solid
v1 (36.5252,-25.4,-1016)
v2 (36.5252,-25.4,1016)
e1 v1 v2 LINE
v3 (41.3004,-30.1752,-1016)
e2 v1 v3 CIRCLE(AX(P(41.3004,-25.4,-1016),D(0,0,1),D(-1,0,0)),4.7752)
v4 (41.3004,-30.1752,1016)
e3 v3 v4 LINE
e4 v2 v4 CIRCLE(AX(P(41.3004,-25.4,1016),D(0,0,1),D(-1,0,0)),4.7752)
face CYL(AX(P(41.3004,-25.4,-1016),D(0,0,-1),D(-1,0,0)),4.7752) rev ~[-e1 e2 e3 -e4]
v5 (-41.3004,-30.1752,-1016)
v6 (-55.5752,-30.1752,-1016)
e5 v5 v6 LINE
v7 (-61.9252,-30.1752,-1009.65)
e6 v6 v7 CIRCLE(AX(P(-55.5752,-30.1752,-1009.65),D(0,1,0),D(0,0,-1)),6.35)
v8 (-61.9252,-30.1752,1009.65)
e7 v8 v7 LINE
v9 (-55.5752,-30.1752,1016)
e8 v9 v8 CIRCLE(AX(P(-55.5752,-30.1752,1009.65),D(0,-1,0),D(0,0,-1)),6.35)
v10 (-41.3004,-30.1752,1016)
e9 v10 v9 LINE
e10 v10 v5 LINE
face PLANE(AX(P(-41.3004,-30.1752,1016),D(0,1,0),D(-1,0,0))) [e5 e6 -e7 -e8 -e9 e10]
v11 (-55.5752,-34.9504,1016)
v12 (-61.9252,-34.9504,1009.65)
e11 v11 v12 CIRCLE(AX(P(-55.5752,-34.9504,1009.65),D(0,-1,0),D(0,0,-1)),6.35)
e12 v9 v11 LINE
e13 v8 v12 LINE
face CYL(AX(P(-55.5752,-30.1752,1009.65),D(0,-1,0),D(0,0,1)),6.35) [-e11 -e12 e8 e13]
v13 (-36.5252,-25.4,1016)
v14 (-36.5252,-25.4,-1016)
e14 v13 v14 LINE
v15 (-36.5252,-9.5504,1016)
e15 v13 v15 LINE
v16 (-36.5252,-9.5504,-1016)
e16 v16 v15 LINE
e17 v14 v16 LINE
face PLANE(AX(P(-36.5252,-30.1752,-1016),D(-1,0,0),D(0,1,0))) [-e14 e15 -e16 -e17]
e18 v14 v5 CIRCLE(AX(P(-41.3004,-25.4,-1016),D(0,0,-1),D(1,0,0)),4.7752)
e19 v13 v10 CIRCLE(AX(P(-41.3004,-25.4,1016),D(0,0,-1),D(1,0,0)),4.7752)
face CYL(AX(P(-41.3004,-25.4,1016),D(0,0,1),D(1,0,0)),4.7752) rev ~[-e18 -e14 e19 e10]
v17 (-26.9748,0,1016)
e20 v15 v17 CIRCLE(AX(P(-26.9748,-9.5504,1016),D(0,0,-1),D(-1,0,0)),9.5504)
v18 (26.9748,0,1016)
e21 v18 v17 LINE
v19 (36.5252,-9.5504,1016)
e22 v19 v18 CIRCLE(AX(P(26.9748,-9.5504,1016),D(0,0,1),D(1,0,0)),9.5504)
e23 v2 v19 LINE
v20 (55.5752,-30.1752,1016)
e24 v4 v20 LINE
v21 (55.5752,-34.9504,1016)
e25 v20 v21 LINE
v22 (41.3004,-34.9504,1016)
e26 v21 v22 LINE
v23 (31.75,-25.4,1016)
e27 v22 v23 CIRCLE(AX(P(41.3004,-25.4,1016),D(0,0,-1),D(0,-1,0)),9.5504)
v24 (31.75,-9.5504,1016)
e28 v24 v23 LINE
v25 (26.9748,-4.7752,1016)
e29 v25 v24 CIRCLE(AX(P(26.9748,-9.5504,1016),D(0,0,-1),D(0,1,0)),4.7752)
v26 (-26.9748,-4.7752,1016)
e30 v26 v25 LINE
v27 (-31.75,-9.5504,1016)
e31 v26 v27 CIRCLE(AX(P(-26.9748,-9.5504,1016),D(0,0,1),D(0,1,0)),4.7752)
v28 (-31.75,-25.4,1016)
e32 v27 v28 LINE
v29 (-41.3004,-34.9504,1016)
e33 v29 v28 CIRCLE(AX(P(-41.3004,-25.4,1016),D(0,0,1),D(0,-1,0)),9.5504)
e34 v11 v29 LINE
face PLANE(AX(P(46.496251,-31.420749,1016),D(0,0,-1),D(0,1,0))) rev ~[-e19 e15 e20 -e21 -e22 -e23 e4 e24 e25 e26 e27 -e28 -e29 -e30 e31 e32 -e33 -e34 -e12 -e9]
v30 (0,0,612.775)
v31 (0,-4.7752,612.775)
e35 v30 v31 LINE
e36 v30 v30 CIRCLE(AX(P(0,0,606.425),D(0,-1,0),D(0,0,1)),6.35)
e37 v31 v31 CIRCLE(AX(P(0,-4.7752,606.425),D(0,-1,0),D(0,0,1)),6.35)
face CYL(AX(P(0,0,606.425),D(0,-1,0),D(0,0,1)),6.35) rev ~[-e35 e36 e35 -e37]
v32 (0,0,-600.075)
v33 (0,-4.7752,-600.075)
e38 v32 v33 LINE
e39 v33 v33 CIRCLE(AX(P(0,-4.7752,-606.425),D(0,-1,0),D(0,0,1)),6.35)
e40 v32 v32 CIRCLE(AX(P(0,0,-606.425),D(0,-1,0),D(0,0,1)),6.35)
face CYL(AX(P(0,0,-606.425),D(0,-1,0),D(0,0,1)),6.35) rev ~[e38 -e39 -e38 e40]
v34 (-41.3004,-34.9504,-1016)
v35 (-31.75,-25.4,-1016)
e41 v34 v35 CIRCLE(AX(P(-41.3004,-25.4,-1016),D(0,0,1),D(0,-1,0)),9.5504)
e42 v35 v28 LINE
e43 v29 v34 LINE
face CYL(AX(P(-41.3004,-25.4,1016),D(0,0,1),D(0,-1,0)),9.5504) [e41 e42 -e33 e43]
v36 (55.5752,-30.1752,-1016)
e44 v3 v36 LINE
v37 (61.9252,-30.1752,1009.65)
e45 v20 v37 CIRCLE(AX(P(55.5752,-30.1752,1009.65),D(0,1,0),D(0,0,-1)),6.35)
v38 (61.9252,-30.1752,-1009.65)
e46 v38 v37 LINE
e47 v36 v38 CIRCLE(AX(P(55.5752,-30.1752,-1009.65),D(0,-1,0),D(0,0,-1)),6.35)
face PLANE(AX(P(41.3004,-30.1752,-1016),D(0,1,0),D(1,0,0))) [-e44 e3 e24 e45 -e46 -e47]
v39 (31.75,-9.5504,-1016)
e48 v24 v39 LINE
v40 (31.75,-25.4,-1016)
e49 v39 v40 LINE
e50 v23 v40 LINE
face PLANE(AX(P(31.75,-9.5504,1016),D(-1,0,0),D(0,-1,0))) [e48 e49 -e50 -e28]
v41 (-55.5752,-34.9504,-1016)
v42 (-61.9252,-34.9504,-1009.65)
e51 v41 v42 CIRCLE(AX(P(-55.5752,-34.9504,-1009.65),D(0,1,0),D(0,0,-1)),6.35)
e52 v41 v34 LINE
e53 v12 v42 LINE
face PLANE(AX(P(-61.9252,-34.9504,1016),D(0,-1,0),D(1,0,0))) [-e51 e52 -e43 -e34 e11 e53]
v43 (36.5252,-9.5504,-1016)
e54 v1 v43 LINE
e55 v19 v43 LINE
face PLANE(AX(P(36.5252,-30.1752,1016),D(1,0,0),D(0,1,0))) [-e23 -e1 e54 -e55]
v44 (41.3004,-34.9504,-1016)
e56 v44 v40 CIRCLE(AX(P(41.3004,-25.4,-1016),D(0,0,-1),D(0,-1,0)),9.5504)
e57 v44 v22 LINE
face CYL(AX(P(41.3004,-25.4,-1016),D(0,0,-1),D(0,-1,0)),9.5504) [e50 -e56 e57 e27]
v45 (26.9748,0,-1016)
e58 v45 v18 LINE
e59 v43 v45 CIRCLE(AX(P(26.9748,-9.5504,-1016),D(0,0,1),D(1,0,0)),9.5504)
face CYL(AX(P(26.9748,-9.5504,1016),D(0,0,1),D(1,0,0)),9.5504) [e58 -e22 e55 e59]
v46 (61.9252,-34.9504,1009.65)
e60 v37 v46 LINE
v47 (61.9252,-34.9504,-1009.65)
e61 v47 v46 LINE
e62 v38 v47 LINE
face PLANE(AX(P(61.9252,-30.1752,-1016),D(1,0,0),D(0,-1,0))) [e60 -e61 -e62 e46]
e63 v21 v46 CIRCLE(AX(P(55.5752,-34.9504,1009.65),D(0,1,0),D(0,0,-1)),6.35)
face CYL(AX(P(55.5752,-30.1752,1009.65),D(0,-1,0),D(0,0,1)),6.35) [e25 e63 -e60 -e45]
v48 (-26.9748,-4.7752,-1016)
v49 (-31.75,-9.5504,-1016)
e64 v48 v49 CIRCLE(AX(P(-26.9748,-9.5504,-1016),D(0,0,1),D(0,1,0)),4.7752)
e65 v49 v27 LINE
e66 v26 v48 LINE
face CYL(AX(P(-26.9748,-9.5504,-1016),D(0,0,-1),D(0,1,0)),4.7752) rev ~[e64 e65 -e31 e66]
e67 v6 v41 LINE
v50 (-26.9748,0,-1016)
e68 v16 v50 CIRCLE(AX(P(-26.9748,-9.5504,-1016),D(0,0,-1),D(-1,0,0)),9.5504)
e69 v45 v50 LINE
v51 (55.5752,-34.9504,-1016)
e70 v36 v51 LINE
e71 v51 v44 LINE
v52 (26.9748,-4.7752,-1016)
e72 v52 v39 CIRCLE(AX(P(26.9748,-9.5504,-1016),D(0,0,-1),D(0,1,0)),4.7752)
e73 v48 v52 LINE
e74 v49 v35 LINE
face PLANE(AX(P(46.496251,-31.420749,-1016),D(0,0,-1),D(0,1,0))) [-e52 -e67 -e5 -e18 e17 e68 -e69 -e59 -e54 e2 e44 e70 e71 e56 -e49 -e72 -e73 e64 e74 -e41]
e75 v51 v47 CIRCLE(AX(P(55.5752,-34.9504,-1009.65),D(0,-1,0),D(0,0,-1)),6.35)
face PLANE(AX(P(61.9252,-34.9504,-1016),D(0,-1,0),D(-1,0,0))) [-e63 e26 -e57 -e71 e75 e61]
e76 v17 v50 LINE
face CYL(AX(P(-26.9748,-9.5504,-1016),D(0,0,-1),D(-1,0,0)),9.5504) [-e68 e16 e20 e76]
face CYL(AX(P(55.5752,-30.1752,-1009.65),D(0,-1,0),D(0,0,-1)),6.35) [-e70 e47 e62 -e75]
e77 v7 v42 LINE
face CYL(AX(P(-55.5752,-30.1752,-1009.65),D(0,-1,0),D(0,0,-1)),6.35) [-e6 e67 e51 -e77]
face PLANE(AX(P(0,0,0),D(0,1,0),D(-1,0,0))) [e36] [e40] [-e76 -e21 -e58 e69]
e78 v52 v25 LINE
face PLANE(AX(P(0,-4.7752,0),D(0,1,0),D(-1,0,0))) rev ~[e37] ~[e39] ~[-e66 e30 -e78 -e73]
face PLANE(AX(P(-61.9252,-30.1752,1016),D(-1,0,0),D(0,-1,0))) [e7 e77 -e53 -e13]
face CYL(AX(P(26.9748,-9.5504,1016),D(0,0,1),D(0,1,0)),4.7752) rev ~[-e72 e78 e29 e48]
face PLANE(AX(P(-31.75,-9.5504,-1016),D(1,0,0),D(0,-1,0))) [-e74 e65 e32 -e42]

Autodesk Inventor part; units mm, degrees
ref_plane "YZ Plane" through (0, 0, 0) normal (1, 0, 0) x (0, 1, 0)
ref_plane "XZ Plane" through (0, 0, 0) normal (0, 1, 0) x (-1, 0, 0)
ref_plane "XY Plane" through (0, 0, 0) normal (0, 0, 1) x (1, 0, 0)
sketch "Sketch1" plane through (0, 0, 0) normal (0, 0, 1) x (1, 0, 0)
  point P0 (0, 0)
sketch "Sketch2" plane through (0, 0, 0) normal (0, 1, 0) x (-1, 0, 0)
  line L0 (-31.75, 1016) -> (31.75, 1016)
  line L1 (31.75, 1016) -> (31.75, -1016)
  line L2 (31.75, -1016) -> (-31.75, -1016)
  line L3 (-31.75, -1016) -> (-31.75, 1016)
  line L4 (-31.75, 1016) -> (31.75, -1016) construction
  line L5 (31.75, 1016) -> (-31.75, -1016) construction
  line L6 (0, -1016) -> (0, 1016)
  point P0 (0, 0)
  point P1 (0, -657.225)
  point P2 (0, -606.425)
  point P3 (0, 657.225)
  point P4 (0, 606.425)
  point P5 (0, 0)
  dimension "d0" = 63.5
  dimension "d1" = 2032
  dimension "d24" = 50.8
  dimension "d26" = 50.8
  dimension "d27" = 1212.85
  dimension "d28" = 606.425
extrude "Plate1" add sketch "Sketch2" against normal blind 4.7752
sketch "Sketch3" plane through (36.5252, 0, 1016) normal (-1, 0, 0) x (0, -1, 0)
  line L0 (0, -2032) -> (0, 0)
  line L1 (0, 0) -> (30.1752, 0)
  line L2 (30.1752, 0) -> (30.1752, -2032)
  line L3 (30.1752, -2032) -> (0, -2032)
edge flange "Flange1" height 25.4 angle 90 thickness 4.7752 bend radius 4.7752 thickness toward (-1, 0, 0) relief tear relief width 4.7752 relief depth 2.3876 corner gap 4.7752 corner form 0 edges at (31.75, -4.7752, 0) (-31.75, -4.7752, 0) wall of the first edge with corners at (36.5252, 0, -1016) (36.5252, 0, 1016) (36.5252, -30.1752, 1016) (36.5252, -30.1752, -1016)
bend "Bend1"
corner "Corner1"
sketch "Sketch4" plane through (31.75, -34.9504, -1016) normal (0, 1, 0) x (-1, 0, 0)
  line L0 (0, 2032) -> (0, 0)
  line L1 (0, 0) -> (-30.1752, 0)
  line L2 (-30.1752, 0) -> (-30.1752, 2032)
  line L3 (-30.1752, 2032) -> (0, 2032)
edge flange "Flange2" height 25.4 angle 90 thickness 4.7752 bend radius 4.7752 thickness toward (0, 1, 0) relief tear relief width 4.7752 relief depth 2.3876 corner gap 4.7752 corner form 0 edges at (36.5252, -30.1752, 0) (-36.5252, -30.1752, 0) wall of the first edge with corners at (31.75, -34.9504, 1016) (31.75, -34.9504, -1016) (61.9252, -34.9504, -1016) (61.9252, -34.9504, 1016)
bend "Bend2"
corner "Corner2"
hole "Hole1" at (0, 0, 606.425) at (0, 0, -606.425) direction (0, -1, 0) diameter 12.7 end through all
fillet "Corner Round1" radius 6.35 4 edges at (61.9252, -32.5628, 1016) (-61.9252, -32.5628, 1016) (-61.9252, -32.5628, -1016) (61.9252, -32.5628, -1016)
equation "\"d28\" = 0.5 * d27"
equation "\"d34\" = Thickness"
equation "\"d2\" = Thickness"
equation "\"d3\" = BendReliefWidth"
equation "\"d4\" = BendReliefDepth"
equation "\"d5\" = MinimumRemnant"
equation "\"d6\" = TransitionRadius"
equation "\"d9\" = BendRadius"
equation "\"d10\" = CornerReliefSize"
equation "\"d11\" = GapSize"
equation "\"d12\" = JacobiRadiusSize"
equation "\"d13\" = BendReliefWidth"
equation "\"d14\" = BendReliefDepth"
equation "\"d15\" = MinimumRemnant"
equation "\"d16\" = TransitionRadius"
equation "\"d19\" = BendRadius"
equation "\"d20\" = CornerReliefSize"
equation "\"d21\" = GapSize"
equation "\"d22\" = JacobiRadiusSize"
equation "\"BendRadius\" = Thickness"
equation "\"BendReliefWidth\" = Thickness"
equation "\"BendReliefDepth\" = 0.5 * Thickness"
equation "\"CornerReliefSize\" = 4 * Thickness"
equation "\"MinimumRemnant\" = 2 * Thickness"
equation "\"TransitionRadius\" = BendRadius"
equation "\"JacobiRadiusSize\" = BendRadius"
equation "\"GapSize\" = Thickness"
equation "\"Thickness\" = 4.7752"
properties part number "5th Wheel Hitch Sliding rail"
